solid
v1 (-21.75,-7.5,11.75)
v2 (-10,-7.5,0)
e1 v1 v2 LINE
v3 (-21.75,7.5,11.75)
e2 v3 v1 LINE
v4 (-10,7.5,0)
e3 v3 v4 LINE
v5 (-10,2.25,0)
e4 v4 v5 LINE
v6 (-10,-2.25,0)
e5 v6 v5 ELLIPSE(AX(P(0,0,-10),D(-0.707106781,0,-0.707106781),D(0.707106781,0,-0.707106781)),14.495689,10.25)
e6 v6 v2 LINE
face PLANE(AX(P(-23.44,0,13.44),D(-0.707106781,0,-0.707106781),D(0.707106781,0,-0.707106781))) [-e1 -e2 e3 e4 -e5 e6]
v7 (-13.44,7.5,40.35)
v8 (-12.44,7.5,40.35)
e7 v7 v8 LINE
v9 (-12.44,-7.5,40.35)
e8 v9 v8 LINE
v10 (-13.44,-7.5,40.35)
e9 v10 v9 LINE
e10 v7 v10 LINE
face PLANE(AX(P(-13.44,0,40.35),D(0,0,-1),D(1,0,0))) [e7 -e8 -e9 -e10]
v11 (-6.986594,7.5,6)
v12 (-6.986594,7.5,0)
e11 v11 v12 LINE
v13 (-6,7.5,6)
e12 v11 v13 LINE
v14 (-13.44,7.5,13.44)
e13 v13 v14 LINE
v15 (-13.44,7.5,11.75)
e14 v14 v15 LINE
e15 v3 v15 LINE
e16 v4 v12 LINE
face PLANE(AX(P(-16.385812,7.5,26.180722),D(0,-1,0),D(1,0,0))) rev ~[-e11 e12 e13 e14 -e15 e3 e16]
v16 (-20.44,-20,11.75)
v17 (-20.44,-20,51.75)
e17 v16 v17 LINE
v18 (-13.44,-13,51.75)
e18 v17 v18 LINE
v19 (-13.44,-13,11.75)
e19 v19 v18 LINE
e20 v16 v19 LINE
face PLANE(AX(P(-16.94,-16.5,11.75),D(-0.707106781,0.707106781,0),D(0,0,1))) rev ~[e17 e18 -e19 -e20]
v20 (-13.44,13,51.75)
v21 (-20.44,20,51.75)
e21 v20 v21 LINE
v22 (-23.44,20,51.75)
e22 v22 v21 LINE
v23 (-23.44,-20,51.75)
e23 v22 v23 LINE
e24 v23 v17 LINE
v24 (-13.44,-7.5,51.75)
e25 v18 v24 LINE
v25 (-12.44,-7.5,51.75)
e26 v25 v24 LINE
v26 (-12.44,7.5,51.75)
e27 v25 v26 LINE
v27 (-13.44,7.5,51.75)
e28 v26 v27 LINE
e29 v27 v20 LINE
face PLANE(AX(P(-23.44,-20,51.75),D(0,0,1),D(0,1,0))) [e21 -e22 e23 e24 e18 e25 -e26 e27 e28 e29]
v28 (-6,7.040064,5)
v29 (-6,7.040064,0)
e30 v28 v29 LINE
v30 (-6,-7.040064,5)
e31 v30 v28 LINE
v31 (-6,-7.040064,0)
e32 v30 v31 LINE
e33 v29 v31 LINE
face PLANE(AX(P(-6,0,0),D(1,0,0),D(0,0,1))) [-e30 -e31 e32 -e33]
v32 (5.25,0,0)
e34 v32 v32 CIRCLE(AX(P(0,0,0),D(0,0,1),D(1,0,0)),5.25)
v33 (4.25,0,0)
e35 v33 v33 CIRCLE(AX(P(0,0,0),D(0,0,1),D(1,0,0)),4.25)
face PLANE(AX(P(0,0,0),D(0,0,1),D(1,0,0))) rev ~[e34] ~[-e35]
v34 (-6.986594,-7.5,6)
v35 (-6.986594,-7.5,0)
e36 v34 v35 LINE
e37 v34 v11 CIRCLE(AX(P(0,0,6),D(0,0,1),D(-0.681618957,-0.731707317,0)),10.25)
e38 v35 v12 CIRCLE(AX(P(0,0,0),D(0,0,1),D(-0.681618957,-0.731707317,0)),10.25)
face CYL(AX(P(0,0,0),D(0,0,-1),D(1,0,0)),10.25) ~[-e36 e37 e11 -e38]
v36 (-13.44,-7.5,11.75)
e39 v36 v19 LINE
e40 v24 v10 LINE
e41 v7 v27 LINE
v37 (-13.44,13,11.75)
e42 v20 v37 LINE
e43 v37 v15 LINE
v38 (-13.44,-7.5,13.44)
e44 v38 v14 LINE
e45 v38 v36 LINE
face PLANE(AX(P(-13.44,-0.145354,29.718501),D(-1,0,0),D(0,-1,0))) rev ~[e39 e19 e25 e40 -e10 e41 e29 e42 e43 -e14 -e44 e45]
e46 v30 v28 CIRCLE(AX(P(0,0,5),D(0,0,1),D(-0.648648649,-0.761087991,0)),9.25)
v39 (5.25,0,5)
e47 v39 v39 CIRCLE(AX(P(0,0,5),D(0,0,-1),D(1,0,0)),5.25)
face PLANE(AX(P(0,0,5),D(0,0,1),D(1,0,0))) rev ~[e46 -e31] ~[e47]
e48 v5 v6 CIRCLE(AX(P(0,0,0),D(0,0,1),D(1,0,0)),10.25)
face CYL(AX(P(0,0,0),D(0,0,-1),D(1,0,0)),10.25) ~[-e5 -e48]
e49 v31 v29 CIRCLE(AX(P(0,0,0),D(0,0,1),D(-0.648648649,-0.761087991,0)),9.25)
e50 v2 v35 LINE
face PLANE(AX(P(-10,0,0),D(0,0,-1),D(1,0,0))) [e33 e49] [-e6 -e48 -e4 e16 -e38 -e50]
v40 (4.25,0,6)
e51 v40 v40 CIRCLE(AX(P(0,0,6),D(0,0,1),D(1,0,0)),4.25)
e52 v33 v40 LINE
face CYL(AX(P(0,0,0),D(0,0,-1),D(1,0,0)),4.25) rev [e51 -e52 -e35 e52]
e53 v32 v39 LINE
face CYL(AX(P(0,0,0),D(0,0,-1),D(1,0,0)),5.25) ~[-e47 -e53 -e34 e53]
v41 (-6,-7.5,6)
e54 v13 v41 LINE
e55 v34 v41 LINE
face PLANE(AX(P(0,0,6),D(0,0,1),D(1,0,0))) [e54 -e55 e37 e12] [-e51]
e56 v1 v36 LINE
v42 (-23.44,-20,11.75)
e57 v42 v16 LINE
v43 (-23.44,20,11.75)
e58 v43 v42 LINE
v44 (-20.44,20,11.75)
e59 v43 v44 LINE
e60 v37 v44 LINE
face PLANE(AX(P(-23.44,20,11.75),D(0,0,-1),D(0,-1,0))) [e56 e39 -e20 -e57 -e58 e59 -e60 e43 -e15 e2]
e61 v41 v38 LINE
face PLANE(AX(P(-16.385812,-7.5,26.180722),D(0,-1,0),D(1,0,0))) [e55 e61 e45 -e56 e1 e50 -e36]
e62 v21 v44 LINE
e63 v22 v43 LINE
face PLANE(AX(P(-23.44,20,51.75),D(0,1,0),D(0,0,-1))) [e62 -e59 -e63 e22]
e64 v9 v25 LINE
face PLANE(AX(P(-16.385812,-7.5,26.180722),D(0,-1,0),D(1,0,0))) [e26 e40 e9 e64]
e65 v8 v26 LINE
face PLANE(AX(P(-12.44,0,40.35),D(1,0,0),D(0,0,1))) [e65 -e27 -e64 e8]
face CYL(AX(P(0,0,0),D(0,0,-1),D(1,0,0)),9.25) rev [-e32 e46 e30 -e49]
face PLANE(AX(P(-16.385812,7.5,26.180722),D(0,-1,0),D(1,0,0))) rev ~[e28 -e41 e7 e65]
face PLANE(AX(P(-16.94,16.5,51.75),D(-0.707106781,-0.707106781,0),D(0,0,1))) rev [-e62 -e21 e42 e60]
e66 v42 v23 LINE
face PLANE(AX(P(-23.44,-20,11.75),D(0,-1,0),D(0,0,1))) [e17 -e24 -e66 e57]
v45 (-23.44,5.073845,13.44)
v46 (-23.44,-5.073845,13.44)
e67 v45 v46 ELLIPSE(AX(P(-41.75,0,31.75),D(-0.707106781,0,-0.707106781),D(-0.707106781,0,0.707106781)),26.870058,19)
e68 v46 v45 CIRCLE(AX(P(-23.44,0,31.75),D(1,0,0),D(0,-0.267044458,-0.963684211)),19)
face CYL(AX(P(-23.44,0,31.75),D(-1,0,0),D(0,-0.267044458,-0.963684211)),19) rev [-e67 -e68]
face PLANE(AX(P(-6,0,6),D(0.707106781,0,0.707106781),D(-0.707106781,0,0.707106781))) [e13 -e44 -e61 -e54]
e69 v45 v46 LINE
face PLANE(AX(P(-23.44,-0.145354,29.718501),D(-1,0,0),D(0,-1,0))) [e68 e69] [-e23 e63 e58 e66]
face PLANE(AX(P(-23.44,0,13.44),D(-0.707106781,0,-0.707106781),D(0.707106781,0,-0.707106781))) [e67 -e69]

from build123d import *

# Parameters (mm, degrees)
F0_R     = 10.25
F0_R_2   = 4.25
F1_DEPTH = 6
F2_T     = -1
F4_DEPTH = 7.5
F6_DEPTH = 10
F7_SIZE  = 7


# Not quite as in the source:
# - a feature names something its author has since deleted; it is built from what else it names


with BuildPart() as f1:
    # F0 (on Top) → F1 (new body)
    with BuildSketch(Plane.XY):
        Circle(F0_R)
        Circle(F0_R_2, mode=Mode.SUBTRACT)
    extrude(amount=F1_DEPTH)

    # F2
    f2_openings = [f1.faces().sort_by_distance(p)[0] for p in [
        (-9.960086, 0, 0),
    ]]
    offset(amount=F2_T, openings=f2_openings)

    # F3 (on Front) → F4 (join, symmetric)
    with BuildSketch(Plane.XZ):
        Polygon((-23.44, 51.75), (-23.44, 13.44), (-10, 0), (-6, 0), (-6, 6), (-13.44, 13.44), (-13.44, 40.35), (-12.44, 40.35), (-12.44, 51.75), align=None)
    extrude(amount=F4_DEPTH, both=True)

    # F5 (on face) → F6 (join, through all)
    with BuildSketch(Plane(origin=(-23.44, 0, 0), x_dir=(0, -1, 0), z_dir=(-1, 0, 0))):
        with BuildLine():
            Line((20, 11.75), (20, 51.75))
            Line((20, 51.75), (7.5, 51.75))
            Line((7.5, 51.75), (7.5, 49.2070902501))
            ThreePointArc((7.5, 49.2070902501), (15.8666316526, 42.2022724802), (19, 31.75))
            ThreePointArc((19, 31.75), (15.8666316526, 21.2977275198), (7.5, 14.2929097499))
            Line((7.5, 14.2929097499), (7.5, 13.44))
            Line((7.5, 13.44), (5.0738446961, 13.44))
            ThreePointArc((5.0738446961, 13.44), (0, 12.75), (-5.0738446961, 13.44))
            Line((-5.0738446961, 13.44), (-7.5, 13.44))
            Line((-7.5, 13.44), (-7.5, 14.2929097499))
            ThreePointArc((-7.5, 14.2929097499), (-19, 31.75), (-7.5, 49.2070902501))
            Line((-7.5, 49.2070902501), (-7.5, 51.75))
            Line((-7.5, 51.75), (-20, 51.75))
            Line((-20, 51.75), (-20, 11.75))
            Line((-20, 11.75), (20, 11.75))
        make_face()
        with BuildLine():
            ThreePointArc((19, 31.75), (15.8666316526, 42.2022724802), (7.5, 49.2070902501))
            Line((7.5, 49.2070902501), (7.5, 14.2929097499))
            ThreePointArc((7.5, 14.2929097499), (15.8666316526, 21.2977275198), (19, 31.75))
        make_face()
        with BuildLine():
            Line((-7.5, 14.2929097499), (-7.5, 49.2070902501))
            ThreePointArc((-7.5, 49.2070902501), (-19, 31.75), (-7.5, 14.2929097499))
        make_face()
    extrude(amount=-F6_DEPTH)

    # F7
    f7_edges = [f1.edges().sort_by_distance(p)[0] for p in [
        (-13.44, -20, 31.75),
        (-13.44, 20, 31.75),
    ]]
    chamfer(f7_edges, length=F7_SIZE)


solid = f1.part
